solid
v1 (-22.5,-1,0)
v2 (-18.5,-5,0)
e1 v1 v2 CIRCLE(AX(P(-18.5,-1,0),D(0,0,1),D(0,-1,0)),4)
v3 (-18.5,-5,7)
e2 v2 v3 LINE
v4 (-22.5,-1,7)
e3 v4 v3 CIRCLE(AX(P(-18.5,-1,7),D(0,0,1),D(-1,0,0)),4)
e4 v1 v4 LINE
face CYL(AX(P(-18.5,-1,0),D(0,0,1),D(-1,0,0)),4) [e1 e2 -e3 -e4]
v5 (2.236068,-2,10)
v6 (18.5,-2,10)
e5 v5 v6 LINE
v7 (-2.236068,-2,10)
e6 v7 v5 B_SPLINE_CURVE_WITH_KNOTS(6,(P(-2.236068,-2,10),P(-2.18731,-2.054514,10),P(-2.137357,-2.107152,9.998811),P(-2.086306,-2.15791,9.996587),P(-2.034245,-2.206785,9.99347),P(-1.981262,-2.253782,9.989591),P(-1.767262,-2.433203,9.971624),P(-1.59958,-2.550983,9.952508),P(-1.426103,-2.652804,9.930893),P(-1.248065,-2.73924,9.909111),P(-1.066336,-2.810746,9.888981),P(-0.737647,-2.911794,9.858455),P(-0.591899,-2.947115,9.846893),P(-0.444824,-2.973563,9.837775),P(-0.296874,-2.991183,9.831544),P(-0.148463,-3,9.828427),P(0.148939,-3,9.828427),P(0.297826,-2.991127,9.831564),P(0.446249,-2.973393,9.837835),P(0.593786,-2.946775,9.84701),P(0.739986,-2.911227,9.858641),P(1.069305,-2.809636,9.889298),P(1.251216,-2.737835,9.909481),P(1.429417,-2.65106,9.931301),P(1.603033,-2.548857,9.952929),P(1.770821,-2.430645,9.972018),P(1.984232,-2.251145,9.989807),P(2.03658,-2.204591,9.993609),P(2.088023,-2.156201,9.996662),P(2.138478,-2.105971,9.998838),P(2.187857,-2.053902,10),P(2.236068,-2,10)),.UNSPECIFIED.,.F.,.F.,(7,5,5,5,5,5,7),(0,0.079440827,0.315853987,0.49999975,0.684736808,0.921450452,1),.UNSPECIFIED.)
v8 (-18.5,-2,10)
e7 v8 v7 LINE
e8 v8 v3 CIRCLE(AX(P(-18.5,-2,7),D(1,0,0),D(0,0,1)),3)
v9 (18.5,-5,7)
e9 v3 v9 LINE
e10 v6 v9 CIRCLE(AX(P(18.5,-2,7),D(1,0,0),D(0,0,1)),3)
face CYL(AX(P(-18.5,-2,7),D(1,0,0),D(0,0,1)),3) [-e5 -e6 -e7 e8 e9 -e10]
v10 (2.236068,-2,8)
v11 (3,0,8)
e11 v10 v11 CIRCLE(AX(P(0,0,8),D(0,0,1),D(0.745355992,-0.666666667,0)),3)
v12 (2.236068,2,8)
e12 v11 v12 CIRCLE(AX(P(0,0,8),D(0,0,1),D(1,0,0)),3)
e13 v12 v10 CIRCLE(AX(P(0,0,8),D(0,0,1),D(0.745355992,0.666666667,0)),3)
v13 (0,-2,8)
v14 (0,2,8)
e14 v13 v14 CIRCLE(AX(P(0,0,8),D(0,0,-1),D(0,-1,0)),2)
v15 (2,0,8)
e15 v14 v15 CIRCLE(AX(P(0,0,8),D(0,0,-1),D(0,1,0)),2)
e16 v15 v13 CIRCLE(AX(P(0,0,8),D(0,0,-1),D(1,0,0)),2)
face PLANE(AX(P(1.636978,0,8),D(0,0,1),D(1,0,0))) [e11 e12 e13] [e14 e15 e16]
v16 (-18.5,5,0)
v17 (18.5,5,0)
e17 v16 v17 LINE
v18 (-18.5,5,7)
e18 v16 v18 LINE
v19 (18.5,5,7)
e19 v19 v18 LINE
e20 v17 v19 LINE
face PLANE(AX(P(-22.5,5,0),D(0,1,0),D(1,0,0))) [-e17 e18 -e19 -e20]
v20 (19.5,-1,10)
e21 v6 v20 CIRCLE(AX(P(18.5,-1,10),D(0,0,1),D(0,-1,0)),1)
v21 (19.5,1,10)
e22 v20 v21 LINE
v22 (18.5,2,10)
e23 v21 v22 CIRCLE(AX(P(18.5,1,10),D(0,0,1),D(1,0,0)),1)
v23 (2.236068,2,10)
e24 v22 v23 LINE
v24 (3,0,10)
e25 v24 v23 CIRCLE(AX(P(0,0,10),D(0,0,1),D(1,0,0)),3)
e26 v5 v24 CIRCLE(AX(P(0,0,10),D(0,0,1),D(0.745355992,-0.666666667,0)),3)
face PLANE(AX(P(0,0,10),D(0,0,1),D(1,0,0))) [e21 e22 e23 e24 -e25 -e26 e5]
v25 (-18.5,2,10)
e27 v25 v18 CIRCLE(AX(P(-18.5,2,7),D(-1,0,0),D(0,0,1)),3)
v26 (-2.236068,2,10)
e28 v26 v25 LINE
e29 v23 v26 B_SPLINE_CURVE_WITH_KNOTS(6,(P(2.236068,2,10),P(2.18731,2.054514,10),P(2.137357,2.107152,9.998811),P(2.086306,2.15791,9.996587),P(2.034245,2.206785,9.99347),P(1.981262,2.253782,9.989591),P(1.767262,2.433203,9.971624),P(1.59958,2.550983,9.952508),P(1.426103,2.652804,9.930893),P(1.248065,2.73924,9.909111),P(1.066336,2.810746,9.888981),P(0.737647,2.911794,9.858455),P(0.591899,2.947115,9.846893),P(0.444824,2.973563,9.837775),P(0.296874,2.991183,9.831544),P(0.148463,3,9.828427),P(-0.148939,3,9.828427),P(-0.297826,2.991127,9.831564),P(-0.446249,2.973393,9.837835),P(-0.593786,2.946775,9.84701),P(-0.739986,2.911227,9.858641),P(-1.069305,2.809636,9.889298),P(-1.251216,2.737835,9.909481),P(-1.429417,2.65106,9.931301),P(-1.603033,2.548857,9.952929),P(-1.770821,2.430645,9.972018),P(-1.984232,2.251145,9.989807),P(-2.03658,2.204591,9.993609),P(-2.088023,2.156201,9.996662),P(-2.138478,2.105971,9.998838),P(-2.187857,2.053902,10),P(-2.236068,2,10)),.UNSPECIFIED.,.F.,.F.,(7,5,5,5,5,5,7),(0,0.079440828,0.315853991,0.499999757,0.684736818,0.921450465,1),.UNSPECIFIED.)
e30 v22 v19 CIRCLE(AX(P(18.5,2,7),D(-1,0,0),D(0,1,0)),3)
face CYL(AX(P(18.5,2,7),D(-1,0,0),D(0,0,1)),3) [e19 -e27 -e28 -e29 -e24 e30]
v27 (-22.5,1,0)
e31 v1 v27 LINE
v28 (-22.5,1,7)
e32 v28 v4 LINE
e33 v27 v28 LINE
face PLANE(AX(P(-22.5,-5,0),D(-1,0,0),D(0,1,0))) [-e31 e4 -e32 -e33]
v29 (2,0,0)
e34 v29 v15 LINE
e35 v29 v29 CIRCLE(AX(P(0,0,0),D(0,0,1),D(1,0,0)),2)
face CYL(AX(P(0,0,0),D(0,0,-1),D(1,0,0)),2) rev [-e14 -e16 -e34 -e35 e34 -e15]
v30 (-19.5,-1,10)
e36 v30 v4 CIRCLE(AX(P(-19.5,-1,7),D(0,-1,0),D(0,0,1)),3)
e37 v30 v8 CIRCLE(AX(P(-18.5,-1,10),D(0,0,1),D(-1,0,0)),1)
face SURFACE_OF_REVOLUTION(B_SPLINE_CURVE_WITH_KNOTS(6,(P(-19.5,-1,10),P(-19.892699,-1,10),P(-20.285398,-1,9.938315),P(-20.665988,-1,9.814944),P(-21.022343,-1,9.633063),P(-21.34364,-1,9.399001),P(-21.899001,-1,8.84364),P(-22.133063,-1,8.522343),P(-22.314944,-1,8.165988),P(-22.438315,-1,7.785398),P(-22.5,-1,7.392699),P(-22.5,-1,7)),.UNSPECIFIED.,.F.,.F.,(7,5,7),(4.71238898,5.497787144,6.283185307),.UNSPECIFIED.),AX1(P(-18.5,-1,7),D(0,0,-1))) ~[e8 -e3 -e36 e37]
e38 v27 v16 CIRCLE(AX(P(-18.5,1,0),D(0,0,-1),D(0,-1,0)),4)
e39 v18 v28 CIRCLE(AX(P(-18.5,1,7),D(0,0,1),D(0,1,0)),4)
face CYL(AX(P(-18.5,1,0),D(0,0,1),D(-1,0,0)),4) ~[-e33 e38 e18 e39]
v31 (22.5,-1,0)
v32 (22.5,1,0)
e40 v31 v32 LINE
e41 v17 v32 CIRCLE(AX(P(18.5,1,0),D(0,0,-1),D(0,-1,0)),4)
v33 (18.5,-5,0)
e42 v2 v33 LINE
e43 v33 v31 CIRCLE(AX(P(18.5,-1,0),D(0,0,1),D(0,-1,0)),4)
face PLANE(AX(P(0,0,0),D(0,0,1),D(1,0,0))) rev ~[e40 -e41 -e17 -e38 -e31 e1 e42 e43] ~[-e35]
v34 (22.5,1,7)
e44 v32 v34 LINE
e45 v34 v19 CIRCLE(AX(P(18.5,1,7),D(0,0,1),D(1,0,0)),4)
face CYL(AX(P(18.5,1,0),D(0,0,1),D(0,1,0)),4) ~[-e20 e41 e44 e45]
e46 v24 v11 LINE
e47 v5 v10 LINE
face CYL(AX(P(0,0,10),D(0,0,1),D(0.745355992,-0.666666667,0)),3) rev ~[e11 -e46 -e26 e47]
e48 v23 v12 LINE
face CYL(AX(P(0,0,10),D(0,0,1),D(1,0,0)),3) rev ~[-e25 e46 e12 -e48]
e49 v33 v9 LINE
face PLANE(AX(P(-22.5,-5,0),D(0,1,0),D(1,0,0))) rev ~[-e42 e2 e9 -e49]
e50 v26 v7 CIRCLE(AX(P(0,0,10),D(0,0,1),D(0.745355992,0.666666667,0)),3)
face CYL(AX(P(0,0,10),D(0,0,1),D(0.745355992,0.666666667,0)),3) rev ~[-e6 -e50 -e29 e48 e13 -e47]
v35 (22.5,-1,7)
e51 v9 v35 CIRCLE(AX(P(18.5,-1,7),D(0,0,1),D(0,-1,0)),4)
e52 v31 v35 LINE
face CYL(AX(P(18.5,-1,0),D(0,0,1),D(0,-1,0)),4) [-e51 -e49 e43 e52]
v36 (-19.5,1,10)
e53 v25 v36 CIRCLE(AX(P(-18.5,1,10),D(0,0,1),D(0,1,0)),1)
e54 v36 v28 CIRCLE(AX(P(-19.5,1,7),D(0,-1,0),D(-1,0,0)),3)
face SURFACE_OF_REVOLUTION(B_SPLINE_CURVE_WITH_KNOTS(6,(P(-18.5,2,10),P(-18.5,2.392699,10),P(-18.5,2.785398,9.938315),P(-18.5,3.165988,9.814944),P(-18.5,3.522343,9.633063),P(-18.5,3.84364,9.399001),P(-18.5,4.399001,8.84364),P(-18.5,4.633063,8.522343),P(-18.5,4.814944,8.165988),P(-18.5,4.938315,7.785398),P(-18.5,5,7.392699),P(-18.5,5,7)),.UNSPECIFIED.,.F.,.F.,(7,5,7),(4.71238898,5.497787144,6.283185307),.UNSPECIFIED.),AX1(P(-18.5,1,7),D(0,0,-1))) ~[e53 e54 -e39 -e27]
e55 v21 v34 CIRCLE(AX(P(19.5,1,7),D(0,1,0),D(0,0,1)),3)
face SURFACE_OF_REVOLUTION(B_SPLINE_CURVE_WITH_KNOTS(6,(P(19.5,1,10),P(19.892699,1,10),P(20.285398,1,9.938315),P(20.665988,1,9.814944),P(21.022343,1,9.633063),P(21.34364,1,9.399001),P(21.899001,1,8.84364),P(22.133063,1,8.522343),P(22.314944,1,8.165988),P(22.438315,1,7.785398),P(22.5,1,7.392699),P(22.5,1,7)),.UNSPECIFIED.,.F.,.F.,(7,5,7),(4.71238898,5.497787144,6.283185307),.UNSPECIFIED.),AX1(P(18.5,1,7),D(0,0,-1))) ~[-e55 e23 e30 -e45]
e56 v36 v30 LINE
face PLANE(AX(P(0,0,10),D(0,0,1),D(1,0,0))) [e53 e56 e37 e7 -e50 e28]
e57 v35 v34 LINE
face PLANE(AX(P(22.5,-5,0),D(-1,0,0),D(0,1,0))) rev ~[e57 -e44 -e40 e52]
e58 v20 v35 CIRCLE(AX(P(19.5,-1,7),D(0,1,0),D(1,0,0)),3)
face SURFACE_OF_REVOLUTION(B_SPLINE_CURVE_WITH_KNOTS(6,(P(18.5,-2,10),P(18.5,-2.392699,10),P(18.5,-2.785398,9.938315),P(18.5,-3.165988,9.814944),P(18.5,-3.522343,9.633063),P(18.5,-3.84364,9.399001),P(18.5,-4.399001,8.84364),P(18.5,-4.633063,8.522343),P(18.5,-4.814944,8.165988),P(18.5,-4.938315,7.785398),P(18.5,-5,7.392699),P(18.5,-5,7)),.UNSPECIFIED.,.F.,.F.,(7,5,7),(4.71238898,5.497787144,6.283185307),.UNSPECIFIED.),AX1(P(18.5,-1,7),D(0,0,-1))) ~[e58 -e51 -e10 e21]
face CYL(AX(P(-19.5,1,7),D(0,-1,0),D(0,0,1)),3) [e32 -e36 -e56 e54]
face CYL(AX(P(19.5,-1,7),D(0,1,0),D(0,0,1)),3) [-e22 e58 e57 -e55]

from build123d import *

# Parameters (mm, degrees)
F0_W     = 45
F0_H     = 10
F0_R     = 3
F0_R_2   = 2
F1_DEPTH = 10
F2_R     = 4
F3_R     = 3
F5_DEPTH = 2


with BuildPart() as f1:
    # F0 (on Top) → F1 (new body)
    with BuildSketch(Plane.XY):
        Rectangle(F0_W, F0_H)
        Circle(F0_R, mode=Mode.SUBTRACT)
        Circle(F0_R)
        Circle(F0_R_2, mode=Mode.SUBTRACT)
    extrude(amount=F1_DEPTH)

    # F2
    f2_edges = [f1.edges().sort_by_distance(p)[0] for p in [
        (-22.5, -5, 5),
        (22.5, -5, 5),
        (22.5, 5, 5),
        (-22.5, 5, 5),
    ]]
    fillet(f2_edges, radius=F2_R)

    # F3
    f3_edges = [f1.edges().sort_by_distance(p)[0] for p in [
        (0, -5, 10),
        (0, 5, 10),
        (21.328427, 3.828427, 10),
        (-21.328427, 3.828427, 10),
        (22.5, 0, 10),
        (-22.5, 0, 10),
        (21.328427, -3.828427, 10),
        (-21.328427, -3.828427, 10),
    ]]
    fillet(f3_edges, radius=F3_R)

    # F4 (on face) → F5 (cut)
    with BuildSketch(Plane.XY.offset(10)):
        with BuildLine():
            ThreePointArc((0, 2), (1.4142135624, 1.4142135624), (2, 0))
            ThreePointArc((2, 0), (1.4142135624, -1.4142135624), (0, -2))
            Line((0, -2), (2.2360679775, -2))
            ThreePointArc((2.2360679775, -2), (2.8025170769, -1.0704662693), (3, 0))
            ThreePointArc((3, 0), (2.8025170769, 1.0704662693), (2.2360679775, 2))
            Line((2.2360679775, 2), (0, 2))
        make_face()
        with BuildLine():
            Line((-2.2360679775, 2), (0, 2))
            Line((0, 2), (2.2360679775, 2))
            ThreePointArc((2.2360679775, 2), (0, 3), (-2.2360679775, 2))
        make_face()
        with BuildLine():
            ThreePointArc((0, -2), (-2, 0), (0, 2))
            Line((0, 2), (-2.2360679775, 2))
            ThreePointArc((-2.2360679775, 2), (-3, 0), (-2.2360679775, -2))
            Line((-2.2360679775, -2), (0, -2))
        make_face()
        with BuildLine():
            Line((2.2360679775, -2), (0, -2))
            Line((0, -2), (-2.2360679775, -2))
            ThreePointArc((-2.2360679775, -2), (0, -3), (2.2360679775, -2))
        make_face()
    extrude(amount=-F5_DEPTH, mode=Mode.SUBTRACT)


solid = f1.part
